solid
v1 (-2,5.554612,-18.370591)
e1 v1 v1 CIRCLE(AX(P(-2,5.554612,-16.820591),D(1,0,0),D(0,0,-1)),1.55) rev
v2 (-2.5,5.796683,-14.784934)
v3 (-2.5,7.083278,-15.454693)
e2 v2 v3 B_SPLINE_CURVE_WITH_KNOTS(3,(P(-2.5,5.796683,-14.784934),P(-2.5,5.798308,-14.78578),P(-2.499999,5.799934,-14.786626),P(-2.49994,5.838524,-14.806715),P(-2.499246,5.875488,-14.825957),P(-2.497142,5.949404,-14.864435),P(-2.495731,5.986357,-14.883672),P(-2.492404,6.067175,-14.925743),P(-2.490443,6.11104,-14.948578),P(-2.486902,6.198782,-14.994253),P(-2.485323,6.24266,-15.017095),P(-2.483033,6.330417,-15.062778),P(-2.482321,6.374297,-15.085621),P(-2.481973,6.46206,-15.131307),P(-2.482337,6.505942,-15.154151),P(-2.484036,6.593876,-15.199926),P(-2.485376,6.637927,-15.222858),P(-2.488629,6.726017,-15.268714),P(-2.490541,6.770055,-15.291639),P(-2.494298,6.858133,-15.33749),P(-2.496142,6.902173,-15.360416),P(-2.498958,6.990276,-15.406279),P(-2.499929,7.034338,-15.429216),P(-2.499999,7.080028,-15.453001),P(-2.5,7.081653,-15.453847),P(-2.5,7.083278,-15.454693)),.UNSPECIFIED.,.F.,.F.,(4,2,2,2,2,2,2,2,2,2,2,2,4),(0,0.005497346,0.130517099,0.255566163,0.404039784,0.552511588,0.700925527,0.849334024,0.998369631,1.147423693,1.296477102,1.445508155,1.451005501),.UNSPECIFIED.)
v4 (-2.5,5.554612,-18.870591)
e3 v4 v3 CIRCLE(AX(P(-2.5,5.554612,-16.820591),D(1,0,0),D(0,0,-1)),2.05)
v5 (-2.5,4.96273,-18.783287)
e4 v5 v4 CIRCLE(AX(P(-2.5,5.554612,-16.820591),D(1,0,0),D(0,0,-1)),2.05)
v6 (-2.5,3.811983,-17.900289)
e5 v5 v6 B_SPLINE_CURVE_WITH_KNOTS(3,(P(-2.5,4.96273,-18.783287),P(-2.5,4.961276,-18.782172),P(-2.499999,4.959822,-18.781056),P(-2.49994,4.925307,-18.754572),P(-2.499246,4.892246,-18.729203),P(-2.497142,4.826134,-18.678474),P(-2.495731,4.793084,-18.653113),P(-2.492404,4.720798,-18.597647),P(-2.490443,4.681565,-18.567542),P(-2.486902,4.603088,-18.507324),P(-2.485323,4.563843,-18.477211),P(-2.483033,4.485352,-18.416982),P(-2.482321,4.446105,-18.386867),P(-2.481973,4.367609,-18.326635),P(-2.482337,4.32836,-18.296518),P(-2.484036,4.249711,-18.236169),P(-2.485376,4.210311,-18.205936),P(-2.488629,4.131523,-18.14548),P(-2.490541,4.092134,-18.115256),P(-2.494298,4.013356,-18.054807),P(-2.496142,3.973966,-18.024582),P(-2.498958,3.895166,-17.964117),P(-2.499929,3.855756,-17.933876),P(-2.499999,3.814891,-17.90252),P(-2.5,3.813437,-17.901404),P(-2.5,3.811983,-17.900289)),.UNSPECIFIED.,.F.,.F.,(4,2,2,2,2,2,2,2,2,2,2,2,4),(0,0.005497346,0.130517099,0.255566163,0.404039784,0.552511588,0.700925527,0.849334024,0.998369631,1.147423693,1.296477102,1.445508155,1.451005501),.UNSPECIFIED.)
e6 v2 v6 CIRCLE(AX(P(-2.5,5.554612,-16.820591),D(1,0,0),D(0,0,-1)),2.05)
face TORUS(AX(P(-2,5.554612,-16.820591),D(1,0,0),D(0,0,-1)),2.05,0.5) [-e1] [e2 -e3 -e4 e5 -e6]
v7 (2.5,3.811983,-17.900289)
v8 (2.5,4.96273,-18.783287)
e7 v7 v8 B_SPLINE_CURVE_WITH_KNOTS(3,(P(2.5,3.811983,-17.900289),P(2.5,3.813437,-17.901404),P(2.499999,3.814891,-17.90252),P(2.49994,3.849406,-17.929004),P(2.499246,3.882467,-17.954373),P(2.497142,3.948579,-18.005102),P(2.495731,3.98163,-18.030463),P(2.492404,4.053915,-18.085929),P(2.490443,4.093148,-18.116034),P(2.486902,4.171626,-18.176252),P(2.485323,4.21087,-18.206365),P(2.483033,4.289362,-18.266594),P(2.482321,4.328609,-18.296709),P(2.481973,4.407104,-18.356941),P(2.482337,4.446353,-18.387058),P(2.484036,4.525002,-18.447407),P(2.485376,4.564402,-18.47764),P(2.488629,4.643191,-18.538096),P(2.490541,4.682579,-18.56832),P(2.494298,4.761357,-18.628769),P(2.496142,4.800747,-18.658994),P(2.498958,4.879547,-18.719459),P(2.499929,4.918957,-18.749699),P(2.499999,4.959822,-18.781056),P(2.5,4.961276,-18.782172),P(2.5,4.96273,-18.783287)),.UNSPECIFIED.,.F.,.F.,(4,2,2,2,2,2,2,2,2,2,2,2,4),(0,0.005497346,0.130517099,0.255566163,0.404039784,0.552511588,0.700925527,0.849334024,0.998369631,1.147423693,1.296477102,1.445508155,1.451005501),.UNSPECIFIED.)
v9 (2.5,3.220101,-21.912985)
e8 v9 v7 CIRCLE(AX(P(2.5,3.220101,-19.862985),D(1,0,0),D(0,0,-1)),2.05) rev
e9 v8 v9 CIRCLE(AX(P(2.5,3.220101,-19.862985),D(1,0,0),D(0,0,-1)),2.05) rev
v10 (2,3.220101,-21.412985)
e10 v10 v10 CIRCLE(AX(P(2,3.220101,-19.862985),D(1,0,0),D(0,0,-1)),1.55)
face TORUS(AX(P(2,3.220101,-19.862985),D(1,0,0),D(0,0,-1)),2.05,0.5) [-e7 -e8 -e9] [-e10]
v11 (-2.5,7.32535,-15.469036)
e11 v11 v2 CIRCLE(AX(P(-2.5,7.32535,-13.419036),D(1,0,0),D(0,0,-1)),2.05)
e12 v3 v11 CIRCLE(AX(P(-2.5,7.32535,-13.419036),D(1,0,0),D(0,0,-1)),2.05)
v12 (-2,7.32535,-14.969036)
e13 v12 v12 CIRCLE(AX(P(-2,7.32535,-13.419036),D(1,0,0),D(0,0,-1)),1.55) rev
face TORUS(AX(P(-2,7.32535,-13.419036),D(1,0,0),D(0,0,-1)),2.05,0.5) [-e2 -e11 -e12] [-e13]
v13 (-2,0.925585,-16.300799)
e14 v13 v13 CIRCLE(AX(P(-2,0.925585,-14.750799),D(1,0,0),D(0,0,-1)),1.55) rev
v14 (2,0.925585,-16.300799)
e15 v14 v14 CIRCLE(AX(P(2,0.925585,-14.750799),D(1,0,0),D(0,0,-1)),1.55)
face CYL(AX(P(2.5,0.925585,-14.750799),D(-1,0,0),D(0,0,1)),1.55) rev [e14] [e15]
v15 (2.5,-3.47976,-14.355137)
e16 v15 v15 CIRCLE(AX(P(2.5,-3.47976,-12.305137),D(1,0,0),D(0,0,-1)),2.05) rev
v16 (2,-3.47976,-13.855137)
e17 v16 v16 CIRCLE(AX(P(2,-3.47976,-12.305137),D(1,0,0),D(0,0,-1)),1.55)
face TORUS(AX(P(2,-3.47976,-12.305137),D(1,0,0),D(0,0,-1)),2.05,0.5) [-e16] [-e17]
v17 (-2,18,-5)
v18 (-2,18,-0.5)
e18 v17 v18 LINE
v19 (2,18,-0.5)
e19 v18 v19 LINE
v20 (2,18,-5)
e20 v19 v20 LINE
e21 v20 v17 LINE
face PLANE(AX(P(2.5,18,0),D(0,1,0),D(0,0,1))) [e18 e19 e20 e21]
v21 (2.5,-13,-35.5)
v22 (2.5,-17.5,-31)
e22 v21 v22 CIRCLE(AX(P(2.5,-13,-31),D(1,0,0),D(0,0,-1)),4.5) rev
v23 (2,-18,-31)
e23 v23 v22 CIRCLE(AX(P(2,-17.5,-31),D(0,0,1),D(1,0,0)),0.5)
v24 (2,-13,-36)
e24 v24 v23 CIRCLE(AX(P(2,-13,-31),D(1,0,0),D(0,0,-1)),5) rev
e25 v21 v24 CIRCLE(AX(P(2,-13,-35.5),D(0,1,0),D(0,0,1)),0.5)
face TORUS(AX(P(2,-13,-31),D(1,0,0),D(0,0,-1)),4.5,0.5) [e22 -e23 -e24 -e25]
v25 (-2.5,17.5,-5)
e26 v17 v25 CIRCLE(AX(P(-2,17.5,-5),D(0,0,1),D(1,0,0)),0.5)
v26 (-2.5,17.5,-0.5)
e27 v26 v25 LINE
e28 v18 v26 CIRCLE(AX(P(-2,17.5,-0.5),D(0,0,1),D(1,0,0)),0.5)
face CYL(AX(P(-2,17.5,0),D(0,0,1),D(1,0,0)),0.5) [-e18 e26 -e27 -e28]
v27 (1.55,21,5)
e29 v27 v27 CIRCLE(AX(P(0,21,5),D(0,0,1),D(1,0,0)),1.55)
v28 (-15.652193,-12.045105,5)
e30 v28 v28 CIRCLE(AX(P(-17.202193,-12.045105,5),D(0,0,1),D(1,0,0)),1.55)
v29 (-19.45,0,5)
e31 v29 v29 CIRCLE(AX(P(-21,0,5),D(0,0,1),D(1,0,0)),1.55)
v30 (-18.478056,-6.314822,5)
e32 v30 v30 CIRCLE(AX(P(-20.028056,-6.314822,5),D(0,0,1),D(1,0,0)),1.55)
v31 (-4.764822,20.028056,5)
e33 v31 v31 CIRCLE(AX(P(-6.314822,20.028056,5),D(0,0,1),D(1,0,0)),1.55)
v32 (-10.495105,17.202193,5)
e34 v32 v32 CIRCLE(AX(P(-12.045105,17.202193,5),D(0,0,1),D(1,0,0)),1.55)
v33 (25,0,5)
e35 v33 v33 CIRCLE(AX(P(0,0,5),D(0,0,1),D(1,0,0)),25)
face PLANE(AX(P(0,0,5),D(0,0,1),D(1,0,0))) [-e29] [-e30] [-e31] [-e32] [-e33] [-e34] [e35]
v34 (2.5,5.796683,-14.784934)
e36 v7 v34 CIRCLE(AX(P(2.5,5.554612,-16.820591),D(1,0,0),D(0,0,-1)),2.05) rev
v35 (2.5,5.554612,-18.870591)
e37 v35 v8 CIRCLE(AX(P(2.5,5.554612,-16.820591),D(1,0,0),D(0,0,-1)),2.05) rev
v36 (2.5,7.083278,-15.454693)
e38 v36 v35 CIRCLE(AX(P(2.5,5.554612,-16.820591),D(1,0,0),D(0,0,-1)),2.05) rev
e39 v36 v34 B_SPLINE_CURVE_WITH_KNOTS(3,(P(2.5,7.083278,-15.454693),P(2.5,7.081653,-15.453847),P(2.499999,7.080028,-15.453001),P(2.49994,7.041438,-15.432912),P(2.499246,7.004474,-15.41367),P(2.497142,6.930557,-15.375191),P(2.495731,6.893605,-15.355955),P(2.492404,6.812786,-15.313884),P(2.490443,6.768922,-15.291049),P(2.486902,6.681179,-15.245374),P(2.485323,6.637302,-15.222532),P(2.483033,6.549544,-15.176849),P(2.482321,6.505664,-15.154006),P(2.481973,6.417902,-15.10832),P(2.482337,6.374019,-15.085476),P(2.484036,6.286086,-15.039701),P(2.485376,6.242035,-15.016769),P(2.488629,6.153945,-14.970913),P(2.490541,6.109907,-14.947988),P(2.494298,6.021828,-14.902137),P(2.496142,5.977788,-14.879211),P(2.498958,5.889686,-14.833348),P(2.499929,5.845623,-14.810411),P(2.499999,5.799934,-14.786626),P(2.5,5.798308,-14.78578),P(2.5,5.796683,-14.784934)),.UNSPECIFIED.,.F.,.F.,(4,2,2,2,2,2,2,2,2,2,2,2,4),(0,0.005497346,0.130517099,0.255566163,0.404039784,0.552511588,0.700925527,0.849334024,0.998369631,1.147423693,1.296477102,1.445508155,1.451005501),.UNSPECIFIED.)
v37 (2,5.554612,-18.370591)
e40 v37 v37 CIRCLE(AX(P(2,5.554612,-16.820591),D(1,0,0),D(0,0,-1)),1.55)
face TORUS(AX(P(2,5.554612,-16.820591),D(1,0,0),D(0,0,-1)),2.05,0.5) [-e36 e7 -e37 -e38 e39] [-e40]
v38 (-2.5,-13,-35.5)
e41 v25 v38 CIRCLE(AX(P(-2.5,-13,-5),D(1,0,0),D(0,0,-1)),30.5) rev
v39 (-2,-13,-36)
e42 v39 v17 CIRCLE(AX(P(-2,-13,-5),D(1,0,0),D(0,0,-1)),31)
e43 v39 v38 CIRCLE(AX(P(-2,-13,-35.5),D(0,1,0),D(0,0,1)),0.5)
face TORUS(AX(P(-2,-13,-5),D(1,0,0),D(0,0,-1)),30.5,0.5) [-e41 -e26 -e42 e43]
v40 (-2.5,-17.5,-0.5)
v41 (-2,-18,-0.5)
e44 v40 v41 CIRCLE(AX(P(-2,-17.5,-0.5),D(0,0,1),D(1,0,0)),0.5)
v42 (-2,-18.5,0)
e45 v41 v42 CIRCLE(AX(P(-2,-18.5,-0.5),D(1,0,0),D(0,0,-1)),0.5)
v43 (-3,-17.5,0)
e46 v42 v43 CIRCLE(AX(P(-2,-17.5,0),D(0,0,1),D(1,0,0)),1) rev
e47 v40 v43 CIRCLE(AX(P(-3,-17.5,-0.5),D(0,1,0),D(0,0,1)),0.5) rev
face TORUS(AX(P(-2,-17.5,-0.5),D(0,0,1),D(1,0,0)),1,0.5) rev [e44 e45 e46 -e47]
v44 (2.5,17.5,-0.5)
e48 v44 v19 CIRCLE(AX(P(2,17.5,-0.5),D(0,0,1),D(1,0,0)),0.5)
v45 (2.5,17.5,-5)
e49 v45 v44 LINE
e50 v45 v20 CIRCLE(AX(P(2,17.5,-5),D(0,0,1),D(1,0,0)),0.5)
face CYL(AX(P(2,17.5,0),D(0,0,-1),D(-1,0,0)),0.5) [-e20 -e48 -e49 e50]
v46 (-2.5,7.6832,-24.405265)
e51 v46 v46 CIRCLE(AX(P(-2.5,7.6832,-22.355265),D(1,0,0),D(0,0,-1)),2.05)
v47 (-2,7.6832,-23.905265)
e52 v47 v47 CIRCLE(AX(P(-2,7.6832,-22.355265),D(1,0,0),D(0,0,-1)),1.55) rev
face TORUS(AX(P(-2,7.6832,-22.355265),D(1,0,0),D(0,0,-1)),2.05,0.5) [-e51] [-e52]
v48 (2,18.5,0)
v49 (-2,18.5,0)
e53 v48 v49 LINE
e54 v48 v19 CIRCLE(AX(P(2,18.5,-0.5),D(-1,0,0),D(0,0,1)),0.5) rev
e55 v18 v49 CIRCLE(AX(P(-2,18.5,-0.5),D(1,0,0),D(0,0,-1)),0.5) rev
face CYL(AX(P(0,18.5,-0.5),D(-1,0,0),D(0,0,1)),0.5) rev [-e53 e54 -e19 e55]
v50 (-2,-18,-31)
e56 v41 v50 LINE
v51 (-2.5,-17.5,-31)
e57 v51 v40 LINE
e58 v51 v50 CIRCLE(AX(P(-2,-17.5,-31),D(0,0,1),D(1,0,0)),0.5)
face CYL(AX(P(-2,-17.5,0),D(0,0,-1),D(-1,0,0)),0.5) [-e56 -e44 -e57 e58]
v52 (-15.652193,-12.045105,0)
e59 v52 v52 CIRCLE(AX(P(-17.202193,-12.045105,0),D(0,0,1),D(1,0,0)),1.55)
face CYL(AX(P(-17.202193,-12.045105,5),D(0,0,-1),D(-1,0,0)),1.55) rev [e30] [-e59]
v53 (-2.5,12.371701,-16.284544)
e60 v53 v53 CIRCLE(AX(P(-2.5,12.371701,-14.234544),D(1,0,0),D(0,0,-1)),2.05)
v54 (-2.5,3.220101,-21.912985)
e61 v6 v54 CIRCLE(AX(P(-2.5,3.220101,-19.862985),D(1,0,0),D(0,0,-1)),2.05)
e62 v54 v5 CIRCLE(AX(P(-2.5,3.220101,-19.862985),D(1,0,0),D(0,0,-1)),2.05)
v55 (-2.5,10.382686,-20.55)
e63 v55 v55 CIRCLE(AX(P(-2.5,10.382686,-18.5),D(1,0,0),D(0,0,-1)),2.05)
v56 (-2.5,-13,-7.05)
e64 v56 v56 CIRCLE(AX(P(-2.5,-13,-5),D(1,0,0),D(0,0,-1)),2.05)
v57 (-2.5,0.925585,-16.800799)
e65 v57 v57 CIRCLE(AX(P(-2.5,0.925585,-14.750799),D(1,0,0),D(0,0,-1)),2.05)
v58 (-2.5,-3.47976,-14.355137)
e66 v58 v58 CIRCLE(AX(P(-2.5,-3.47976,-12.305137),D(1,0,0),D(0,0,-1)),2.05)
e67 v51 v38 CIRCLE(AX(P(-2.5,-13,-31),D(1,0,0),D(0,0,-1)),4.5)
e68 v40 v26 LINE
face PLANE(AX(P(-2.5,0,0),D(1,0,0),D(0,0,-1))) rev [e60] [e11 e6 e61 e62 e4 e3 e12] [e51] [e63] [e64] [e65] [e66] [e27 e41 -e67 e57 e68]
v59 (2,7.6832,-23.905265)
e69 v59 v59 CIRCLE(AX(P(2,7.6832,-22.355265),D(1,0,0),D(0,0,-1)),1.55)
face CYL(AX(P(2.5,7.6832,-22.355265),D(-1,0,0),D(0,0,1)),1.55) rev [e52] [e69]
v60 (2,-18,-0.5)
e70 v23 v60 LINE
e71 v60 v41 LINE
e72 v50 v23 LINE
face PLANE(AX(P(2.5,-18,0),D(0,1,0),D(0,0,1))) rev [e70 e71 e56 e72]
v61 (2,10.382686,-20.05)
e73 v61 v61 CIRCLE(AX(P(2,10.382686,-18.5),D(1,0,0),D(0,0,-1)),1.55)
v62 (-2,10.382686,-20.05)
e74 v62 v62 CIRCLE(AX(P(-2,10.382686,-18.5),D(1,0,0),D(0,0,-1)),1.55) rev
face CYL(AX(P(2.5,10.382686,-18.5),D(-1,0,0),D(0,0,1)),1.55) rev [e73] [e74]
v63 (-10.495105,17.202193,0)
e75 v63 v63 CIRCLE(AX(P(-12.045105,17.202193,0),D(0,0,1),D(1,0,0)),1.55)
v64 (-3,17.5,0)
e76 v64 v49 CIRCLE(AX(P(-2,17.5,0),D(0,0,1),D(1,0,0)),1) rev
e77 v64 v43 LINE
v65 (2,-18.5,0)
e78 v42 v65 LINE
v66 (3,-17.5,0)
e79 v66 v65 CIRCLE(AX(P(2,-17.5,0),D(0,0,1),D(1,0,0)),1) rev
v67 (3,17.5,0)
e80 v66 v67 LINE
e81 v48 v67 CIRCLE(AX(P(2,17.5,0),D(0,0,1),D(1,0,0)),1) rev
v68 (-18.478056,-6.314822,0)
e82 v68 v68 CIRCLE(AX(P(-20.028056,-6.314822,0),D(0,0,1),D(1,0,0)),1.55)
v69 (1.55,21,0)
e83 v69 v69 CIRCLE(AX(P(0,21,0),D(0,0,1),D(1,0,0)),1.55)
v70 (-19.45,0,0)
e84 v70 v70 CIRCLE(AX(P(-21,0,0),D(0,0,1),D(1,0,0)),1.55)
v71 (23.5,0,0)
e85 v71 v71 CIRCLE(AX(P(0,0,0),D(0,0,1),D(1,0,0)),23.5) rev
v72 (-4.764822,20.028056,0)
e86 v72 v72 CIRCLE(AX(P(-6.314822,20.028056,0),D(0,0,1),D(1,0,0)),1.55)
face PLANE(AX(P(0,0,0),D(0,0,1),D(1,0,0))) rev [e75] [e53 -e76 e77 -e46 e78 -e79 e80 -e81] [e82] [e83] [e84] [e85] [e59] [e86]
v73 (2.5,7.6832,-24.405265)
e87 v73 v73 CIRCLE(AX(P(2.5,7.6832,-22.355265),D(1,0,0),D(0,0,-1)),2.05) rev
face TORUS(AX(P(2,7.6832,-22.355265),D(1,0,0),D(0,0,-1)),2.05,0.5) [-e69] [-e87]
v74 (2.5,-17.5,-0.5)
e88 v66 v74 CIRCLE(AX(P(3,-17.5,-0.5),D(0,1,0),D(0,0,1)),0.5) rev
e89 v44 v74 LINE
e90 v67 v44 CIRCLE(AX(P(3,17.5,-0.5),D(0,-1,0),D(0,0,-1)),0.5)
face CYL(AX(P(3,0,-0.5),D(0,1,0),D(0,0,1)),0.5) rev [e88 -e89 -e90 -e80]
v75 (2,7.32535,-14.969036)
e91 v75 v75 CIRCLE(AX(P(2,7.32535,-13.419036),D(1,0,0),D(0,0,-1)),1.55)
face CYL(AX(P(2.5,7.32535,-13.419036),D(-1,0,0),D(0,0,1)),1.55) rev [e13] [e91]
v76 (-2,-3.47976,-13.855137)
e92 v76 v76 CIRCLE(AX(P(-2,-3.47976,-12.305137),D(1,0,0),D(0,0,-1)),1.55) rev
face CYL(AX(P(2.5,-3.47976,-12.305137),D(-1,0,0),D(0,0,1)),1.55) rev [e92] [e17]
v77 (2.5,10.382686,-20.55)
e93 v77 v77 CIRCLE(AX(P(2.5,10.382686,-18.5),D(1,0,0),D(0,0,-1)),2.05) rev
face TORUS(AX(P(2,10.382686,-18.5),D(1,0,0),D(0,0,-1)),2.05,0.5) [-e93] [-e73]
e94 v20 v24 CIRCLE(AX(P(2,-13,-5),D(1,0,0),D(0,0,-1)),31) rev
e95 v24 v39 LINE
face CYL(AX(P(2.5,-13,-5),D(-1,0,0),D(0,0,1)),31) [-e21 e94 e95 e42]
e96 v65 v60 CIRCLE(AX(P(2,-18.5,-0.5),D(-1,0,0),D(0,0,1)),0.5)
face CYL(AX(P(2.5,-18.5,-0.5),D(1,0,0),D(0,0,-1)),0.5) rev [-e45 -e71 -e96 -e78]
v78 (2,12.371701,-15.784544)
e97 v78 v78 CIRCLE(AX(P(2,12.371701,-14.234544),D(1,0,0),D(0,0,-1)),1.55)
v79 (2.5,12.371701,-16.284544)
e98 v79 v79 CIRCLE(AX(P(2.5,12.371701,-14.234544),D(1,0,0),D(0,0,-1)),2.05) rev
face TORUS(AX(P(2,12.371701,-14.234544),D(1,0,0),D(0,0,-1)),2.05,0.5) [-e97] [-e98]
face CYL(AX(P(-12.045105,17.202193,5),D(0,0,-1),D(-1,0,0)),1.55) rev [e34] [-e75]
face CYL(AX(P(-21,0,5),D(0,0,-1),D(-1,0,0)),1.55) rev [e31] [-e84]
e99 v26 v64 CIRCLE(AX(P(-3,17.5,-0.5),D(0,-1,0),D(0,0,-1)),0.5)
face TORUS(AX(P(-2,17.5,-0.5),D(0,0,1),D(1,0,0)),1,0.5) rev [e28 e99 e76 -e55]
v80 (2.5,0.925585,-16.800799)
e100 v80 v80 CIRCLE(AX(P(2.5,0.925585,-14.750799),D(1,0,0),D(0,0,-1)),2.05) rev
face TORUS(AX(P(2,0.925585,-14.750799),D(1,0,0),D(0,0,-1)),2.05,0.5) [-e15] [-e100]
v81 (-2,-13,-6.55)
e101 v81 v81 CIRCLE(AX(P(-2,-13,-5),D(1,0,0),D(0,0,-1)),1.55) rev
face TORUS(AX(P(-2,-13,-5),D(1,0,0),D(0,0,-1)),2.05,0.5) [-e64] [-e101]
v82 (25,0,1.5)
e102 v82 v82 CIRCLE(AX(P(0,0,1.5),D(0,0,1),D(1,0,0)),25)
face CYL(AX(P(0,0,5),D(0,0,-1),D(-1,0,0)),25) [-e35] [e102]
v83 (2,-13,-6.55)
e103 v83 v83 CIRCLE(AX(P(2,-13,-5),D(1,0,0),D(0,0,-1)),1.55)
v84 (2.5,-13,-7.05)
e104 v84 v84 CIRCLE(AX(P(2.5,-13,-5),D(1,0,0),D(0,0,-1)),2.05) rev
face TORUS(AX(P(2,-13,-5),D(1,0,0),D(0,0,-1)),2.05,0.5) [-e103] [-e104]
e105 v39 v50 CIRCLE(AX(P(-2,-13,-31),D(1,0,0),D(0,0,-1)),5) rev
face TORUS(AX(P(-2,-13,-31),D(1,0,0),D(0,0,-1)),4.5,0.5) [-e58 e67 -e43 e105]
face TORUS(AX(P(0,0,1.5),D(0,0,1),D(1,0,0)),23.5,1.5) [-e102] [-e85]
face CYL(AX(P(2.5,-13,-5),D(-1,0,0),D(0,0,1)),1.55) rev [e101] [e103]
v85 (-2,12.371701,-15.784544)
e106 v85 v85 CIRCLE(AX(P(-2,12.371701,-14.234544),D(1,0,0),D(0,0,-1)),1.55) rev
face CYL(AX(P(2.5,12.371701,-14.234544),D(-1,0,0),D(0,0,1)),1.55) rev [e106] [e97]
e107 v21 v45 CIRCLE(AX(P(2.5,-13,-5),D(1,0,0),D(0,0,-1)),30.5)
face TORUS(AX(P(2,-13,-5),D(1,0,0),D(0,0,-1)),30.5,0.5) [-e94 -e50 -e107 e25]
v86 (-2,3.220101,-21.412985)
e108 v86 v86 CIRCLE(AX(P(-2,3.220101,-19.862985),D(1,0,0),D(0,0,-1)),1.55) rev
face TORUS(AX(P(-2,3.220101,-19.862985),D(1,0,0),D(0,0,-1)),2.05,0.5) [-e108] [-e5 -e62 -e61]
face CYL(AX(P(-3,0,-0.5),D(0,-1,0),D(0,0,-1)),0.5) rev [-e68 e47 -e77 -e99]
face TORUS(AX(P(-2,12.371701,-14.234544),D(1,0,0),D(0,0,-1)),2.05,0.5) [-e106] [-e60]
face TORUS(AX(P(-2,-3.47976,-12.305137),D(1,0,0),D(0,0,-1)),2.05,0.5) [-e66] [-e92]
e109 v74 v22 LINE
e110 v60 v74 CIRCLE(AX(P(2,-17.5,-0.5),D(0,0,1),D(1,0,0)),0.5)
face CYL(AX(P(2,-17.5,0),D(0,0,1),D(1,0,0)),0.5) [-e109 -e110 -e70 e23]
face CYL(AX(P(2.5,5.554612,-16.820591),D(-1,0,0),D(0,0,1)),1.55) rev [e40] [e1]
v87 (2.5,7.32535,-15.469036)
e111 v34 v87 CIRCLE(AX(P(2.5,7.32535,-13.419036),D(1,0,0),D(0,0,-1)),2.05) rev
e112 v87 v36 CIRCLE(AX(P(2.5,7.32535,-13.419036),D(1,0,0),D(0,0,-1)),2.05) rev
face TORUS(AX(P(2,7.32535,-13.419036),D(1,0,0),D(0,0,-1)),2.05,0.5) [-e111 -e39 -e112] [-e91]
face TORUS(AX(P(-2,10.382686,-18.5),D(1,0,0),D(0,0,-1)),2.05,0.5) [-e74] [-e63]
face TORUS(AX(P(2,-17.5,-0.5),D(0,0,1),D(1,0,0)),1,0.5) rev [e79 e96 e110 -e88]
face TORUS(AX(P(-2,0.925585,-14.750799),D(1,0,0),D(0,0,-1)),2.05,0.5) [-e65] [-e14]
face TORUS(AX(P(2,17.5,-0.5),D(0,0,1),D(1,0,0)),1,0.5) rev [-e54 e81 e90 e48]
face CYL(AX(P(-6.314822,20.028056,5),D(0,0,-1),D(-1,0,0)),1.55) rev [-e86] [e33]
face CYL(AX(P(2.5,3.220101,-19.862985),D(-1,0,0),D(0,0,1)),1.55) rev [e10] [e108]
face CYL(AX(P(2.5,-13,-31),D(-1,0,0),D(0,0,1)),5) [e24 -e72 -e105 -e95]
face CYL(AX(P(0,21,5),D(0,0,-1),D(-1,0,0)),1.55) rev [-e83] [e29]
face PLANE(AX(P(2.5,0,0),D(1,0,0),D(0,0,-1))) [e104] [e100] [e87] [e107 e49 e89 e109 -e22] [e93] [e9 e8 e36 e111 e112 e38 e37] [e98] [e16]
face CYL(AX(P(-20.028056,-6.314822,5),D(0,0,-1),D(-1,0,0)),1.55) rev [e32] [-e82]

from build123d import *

# Parameters (mm, degrees)
SKETCH_1_R      = 25
SKETCH_1_R_2    = 1.55
EXTRUDE_1_DEPTH = 5
SKETCH_3_R      = 1.55
EXTRUDE_2_DEPTH = 2.5
FILLET_1_R      = 0.5
FILLET_2_R      = 1.5
FILLET_3_R      = 5


with BuildPart() as part:
    # ｽｹｯﾁ1 → ﾎﾞｽ - 押し出し1 (new body)
    with BuildSketch(Plane.XY):
        Circle(SKETCH_1_R)
        with Locations((0, 21)):
            Circle(SKETCH_1_R_2, mode=Mode.SUBTRACT)
        with Locations((-20.028055966, -6.31482179)):
            Circle(SKETCH_1_R_2, mode=Mode.SUBTRACT)
        with Locations((-6.31482179, 20.028055966)):
            Circle(SKETCH_1_R_2, mode=Mode.SUBTRACT)
        with Locations((-21, 0)):
            Circle(SKETCH_1_R_2, mode=Mode.SUBTRACT)
        with Locations((-17.20219293, -12.045105163)):
            Circle(SKETCH_1_R_2, mode=Mode.SUBTRACT)
        with Locations((-12.045105163, 17.20219293)):
            Circle(SKETCH_1_R_2, mode=Mode.SUBTRACT)
    extrude(amount=EXTRUDE_1_DEPTH)

    # ｽｹｯﾁ3 → ﾎﾞｽ - 押し出し2 (add, symmetric)
    with BuildSketch(Plane(origin=(0, 0, 0), x_dir=(0, 0, -1), z_dir=(1, 0, 0))):
        with BuildLine():
            Line((0, 18), (0, -18))
            Line((0, -18), (36, -18))
            Line((36, -18), (36, -13))
            ThreePointArc((36, -13), (26.920310217, 8.920310217), (5, 18))
            Line((5, 18), (0, 18))
        make_face()
        with Locations((5, -13)):
            Circle(SKETCH_3_R, mode=Mode.SUBTRACT)
        with Locations((18.5, 10.382685902)):
            Circle(SKETCH_3_R, mode=Mode.SUBTRACT)
        with Locations((12.305137148, -3.479759917)):
            Circle(SKETCH_3_R, mode=Mode.SUBTRACT)
        with Locations((14.750799418, 0.925584753)):
            Circle(SKETCH_3_R, mode=Mode.SUBTRACT)
        with Locations((13.419035512, 7.325349715)):
            Circle(SKETCH_3_R, mode=Mode.SUBTRACT)
        with Locations((16.820591384, 5.554611808)):
            Circle(SKETCH_3_R, mode=Mode.SUBTRACT)
        with Locations((14.23454387, 12.371700761)):
            Circle(SKETCH_3_R, mode=Mode.SUBTRACT)
        with Locations((19.862984568, 3.22010141)):
            Circle(SKETCH_3_R, mode=Mode.SUBTRACT)
        with Locations((22.355265462, 7.683199964)):
            Circle(SKETCH_3_R, mode=Mode.SUBTRACT)
    extrude(amount=EXTRUDE_2_DEPTH, both=True)

    # ﾌｨﾚｯﾄ1
    # the kernel refuses this fillet: 0.5 mm, written as the material it takes off along each edge
    with BuildSketch(Plane(origin=(-2.5, -18, 0), x_dir=(0, 1, 0), z_dir=(0, 0, -1)), Plane(origin=(2.5, -18, 0), x_dir=(-1, 0, 0), z_dir=(0, 0, -1))) as fillet_1_piece_1:
        with BuildLine():
            CenterArc((FILLET_1_R, FILLET_1_R), FILLET_1_R, 180, 90)
            Line((0, FILLET_1_R), (0, 0))
            Line((0, 0), (FILLET_1_R, 0))
        make_face()
    extrude(amount=37.25, mode=Mode.SUBTRACT)
    with BuildSketch(Plane(origin=(-2.5, -19.25, -36), x_dir=(0, 0, 1), z_dir=(0, 1, 0))) as fillet_1_piece_2:
        with BuildLine():
            CenterArc((FILLET_1_R, FILLET_1_R), FILLET_1_R, 180, 90)
            Line((0, FILLET_1_R), (0, 0))
            Line((0, 0), (FILLET_1_R, 0))
        make_face()
    extrude(amount=6.25, mode=Mode.SUBTRACT)
    with BuildSketch(Plane(origin=(2.5, -13, -5), x_dir=(0, 0, -1), z_dir=(0, -1, 0))) as fillet_1_piece_3:
        with BuildLine():
            CenterArc((31 - FILLET_1_R, -FILLET_1_R), FILLET_1_R, 0, 90)
            Line((31, -FILLET_1_R), (31, 0))
            Line((31, 0), (31 - FILLET_1_R, 0))
        make_face()
    revolve(axis=Axis((2.5, -13, -5), (1, 0, 0)), revolution_arc=90, mode=Mode.SUBTRACT)
    with BuildSketch(Plane(origin=(2.5, 10.382685902, -18.5), x_dir=(0, 0, -1), z_dir=(0, -1, 0))) as fillet_1_piece_4:
        with BuildLine():
            CenterArc((1.55 + FILLET_1_R, -FILLET_1_R), FILLET_1_R, 90, 90)
            Line((1.55, -FILLET_1_R), (1.55, 0))
            Line((1.55, 0), (1.55 + FILLET_1_R, 0))
        make_face()
    revolve(axis=Axis((2.5, 10.382685902, -18.5), (1, 0, 0)), mode=Mode.SUBTRACT)
    with BuildSketch(Plane(origin=(2.5, 7.683199964, -22.355265462), x_dir=(0, 0, -1), z_dir=(0, -1, 0))) as fillet_1_piece_5:
        with BuildLine():
            CenterArc((1.55 + FILLET_1_R, -FILLET_1_R), FILLET_1_R, 90, 90)
            Line((1.55, -FILLET_1_R), (1.55, 0))
            Line((1.55, 0), (1.55 + FILLET_1_R, 0))
        make_face()
    revolve(axis=Axis((2.5, 7.683199964, -22.355265462), (1, 0, 0)), mode=Mode.SUBTRACT)
    with BuildSketch(Plane(origin=(2.5, 12.371700761, -14.23454387), x_dir=(0, 0, -1), z_dir=(0, -1, 0))) as fillet_1_piece_6:
        with BuildLine():
            CenterArc((1.55 + FILLET_1_R, -FILLET_1_R), FILLET_1_R, 90, 90)
            Line((1.55, -FILLET_1_R), (1.55, 0))
            Line((1.55, 0), (1.55 + FILLET_1_R, 0))
        make_face()
    revolve(axis=Axis((2.5, 12.371700761, -14.23454387), (1, 0, 0)), mode=Mode.SUBTRACT)
    with BuildSketch(Plane(origin=(2.5, 5.554611808, -16.820591384), x_dir=(0, 0, -1), z_dir=(0, -1, 0))) as fillet_1_piece_7:
        with BuildLine():
            CenterArc((1.55 + FILLET_1_R, -FILLET_1_R), FILLET_1_R, 90, 90)
            Line((1.55, -FILLET_1_R), (1.55, 0))
            Line((1.55, 0), (1.55 + FILLET_1_R, 0))
        make_face()
    revolve(axis=Axis((2.5, 5.554611808, -16.820591384), (1, 0, 0)), mode=Mode.SUBTRACT)
    with BuildSketch(Plane(origin=(2.5, 3.22010141, -19.862984568), x_dir=(0, 0, -1), z_dir=(0, -1, 0))) as fillet_1_piece_8:
        with BuildLine():
            CenterArc((1.55 + FILLET_1_R, -FILLET_1_R), FILLET_1_R, 90, 90)
            Line((1.55, -FILLET_1_R), (1.55, 0))
            Line((1.55, 0), (1.55 + FILLET_1_R, 0))
        make_face()
    revolve(axis=Axis((2.5, 3.22010141, -19.862984568), (1, 0, 0)), mode=Mode.SUBTRACT)
    with BuildSketch(Plane(origin=(2.5, 0.925584753, -14.750799418), x_dir=(0, 0, -1), z_dir=(0, -1, 0))) as fillet_1_piece_9:
        with BuildLine():
            CenterArc((1.55 + FILLET_1_R, -FILLET_1_R), FILLET_1_R, 90, 90)
            Line((1.55, -FILLET_1_R), (1.55, 0))
            Line((1.55, 0), (1.55 + FILLET_1_R, 0))
        make_face()
    revolve(axis=Axis((2.5, 0.925584753, -14.750799418), (1, 0, 0)), mode=Mode.SUBTRACT)
    with BuildSketch(Plane(origin=(2.5, 7.325349715, -13.419035512), x_dir=(0, 0, -1), z_dir=(0, -1, 0))) as fillet_1_piece_10:
        with BuildLine():
            CenterArc((1.55 + FILLET_1_R, -FILLET_1_R), FILLET_1_R, 90, 90)
            Line((1.55, -FILLET_1_R), (1.55, 0))
            Line((1.55, 0), (1.55 + FILLET_1_R, 0))
        make_face()
    revolve(axis=Axis((2.5, 7.325349715, -13.419035512), (1, 0, 0)), mode=Mode.SUBTRACT)
    with BuildSketch(Plane(origin=(2.5, -3.479759917, -12.305137148), x_dir=(0, 0, -1), z_dir=(0, -1, 0))) as fillet_1_piece_11:
        with BuildLine():
            CenterArc((1.55 + FILLET_1_R, -FILLET_1_R), FILLET_1_R, 90, 90)
            Line((1.55, -FILLET_1_R), (1.55, 0))
            Line((1.55, 0), (1.55 + FILLET_1_R, 0))
        make_face()
    revolve(axis=Axis((2.5, -3.479759917, -12.305137148), (1, 0, 0)), mode=Mode.SUBTRACT)
    with BuildSketch(Plane(origin=(2.5, 18, -5), x_dir=(0, -1, 0), z_dir=(0, 0, 1))) as fillet_1_piece_12:
        with BuildLine():
            CenterArc((FILLET_1_R, -FILLET_1_R), FILLET_1_R, 90, 90)
            Line((0, -FILLET_1_R), (0, 0))
            Line((0, 0), (FILLET_1_R, 0))
        make_face()
    extrude(amount=5, mode=Mode.SUBTRACT)
    with BuildSketch(Plane(origin=(2.5, -13, -5), x_dir=(0, 0, -1), z_dir=(0, -1, 0))) as fillet_1_piece_13:
        with BuildLine():
            CenterArc((1.55 + FILLET_1_R, -FILLET_1_R), FILLET_1_R, 90, 90)
            Line((1.55, -FILLET_1_R), (1.55, 0))
            Line((1.55, 0), (1.55 + FILLET_1_R, 0))
        make_face()
    revolve(axis=Axis((2.5, -13, -5), (1, 0, 0)), mode=Mode.SUBTRACT)
    with BuildSketch(Plane(origin=(2.5, -19.25, -36), x_dir=(0, 0, 1), z_dir=(0, 1, 0))) as fillet_1_piece_14:
        with BuildLine():
            CenterArc((FILLET_1_R, -FILLET_1_R), FILLET_1_R, 90, 90)
            Line((0, -FILLET_1_R), (0, 0))
            Line((0, 0), (FILLET_1_R, 0))
        make_face()
    extrude(amount=6.25, mode=Mode.SUBTRACT)
    with BuildSketch(Plane(origin=(-2.5, 18, -5), x_dir=(0, -1, 0), z_dir=(0, 0, 1))) as fillet_1_piece_15:
        with BuildLine():
            CenterArc((FILLET_1_R, FILLET_1_R), FILLET_1_R, 180, 90)
            Line((0, FILLET_1_R), (0, 0))
            Line((0, 0), (FILLET_1_R, 0))
        make_face()
    extrude(amount=5, mode=Mode.SUBTRACT)
    with BuildSketch(Plane(origin=(-2.5, -13, -5), x_dir=(0, 0, -1), z_dir=(0, -1, 0))) as fillet_1_piece_16:
        with BuildLine():
            CenterArc((31 - FILLET_1_R, FILLET_1_R), FILLET_1_R, 270, 90)
            Line((31, FILLET_1_R), (31, 0))
            Line((31, 0), (31 - FILLET_1_R, 0))
        make_face()
    revolve(axis=Axis((-2.5, -13, -5), (1, 0, 0)), revolution_arc=90, mode=Mode.SUBTRACT)
    with BuildSketch(Plane(origin=(-2.5, -3.479759917, -12.305137148), x_dir=(0, 0, -1), z_dir=(0, -1, 0))) as fillet_1_piece_17:
        with BuildLine():
            CenterArc((1.55 + FILLET_1_R, FILLET_1_R), FILLET_1_R, 180, 90)
            Line((1.55, FILLET_1_R), (1.55, 0))
            Line((1.55, 0), (1.55 + FILLET_1_R, 0))
        make_face()
    revolve(axis=Axis((-2.5, -3.479759917, -12.305137148), (1, 0, 0)), mode=Mode.SUBTRACT)
    with BuildSketch(Plane(origin=(-2.5, 7.325349715, -13.419035512), x_dir=(0, 0, -1), z_dir=(0, -1, 0))) as fillet_1_piece_18:
        with BuildLine():
            CenterArc((1.55 + FILLET_1_R, FILLET_1_R), FILLET_1_R, 180, 90)
            Line((1.55, FILLET_1_R), (1.55, 0))
            Line((1.55, 0), (1.55 + FILLET_1_R, 0))
        make_face()
    revolve(axis=Axis((-2.5, 7.325349715, -13.419035512), (1, 0, 0)), mode=Mode.SUBTRACT)
    with BuildSketch(Plane(origin=(-2.5, 0.925584753, -14.750799418), x_dir=(0, 0, -1), z_dir=(0, -1, 0))) as fillet_1_piece_19:
        with BuildLine():
            CenterArc((1.55 + FILLET_1_R, FILLET_1_R), FILLET_1_R, 180, 90)
            Line((1.55, FILLET_1_R), (1.55, 0))
            Line((1.55, 0), (1.55 + FILLET_1_R, 0))
        make_face()
    revolve(axis=Axis((-2.5, 0.925584753, -14.750799418), (1, 0, 0)), mode=Mode.SUBTRACT)
    with BuildSketch(Plane(origin=(-2.5, 3.22010141, -19.862984568), x_dir=(0, 0, -1), z_dir=(0, -1, 0))) as fillet_1_piece_20:
        with BuildLine():
            CenterArc((1.55 + FILLET_1_R, FILLET_1_R), FILLET_1_R, 180, 90)
            Line((1.55, FILLET_1_R), (1.55, 0))
            Line((1.55, 0), (1.55 + FILLET_1_R, 0))
        make_face()
    revolve(axis=Axis((-2.5, 3.22010141, -19.862984568), (1, 0, 0)), mode=Mode.SUBTRACT)
    with BuildSketch(Plane(origin=(-2.5, 5.554611808, -16.820591384), x_dir=(0, 0, -1), z_dir=(0, -1, 0))) as fillet_1_piece_21:
        with BuildLine():
            CenterArc((1.55 + FILLET_1_R, FILLET_1_R), FILLET_1_R, 180, 90)
            Line((1.55, FILLET_1_R), (1.55, 0))
            Line((1.55, 0), (1.55 + FILLET_1_R, 0))
        make_face()
    revolve(axis=Axis((-2.5, 5.554611808, -16.820591384), (1, 0, 0)), mode=Mode.SUBTRACT)
    with BuildSketch(Plane(origin=(-2.5, 12.371700761, -14.23454387), x_dir=(0, 0, -1), z_dir=(0, -1, 0))) as fillet_1_piece_22:
        with BuildLine():
            CenterArc((1.55 + FILLET_1_R, FILLET_1_R), FILLET_1_R, 180, 90)
            Line((1.55, FILLET_1_R), (1.55, 0))
            Line((1.55, 0), (1.55 + FILLET_1_R, 0))
        make_face()
    revolve(axis=Axis((-2.5, 12.371700761, -14.23454387), (1, 0, 0)), mode=Mode.SUBTRACT)
    with BuildSketch(Plane(origin=(-2.5, 7.683199964, -22.355265462), x_dir=(0, 0, -1), z_dir=(0, -1, 0))) as fillet_1_piece_23:
        with BuildLine():
            CenterArc((1.55 + FILLET_1_R, FILLET_1_R), FILLET_1_R, 180, 90)
            Line((1.55, FILLET_1_R), (1.55, 0))
            Line((1.55, 0), (1.55 + FILLET_1_R, 0))
        make_face()
    revolve(axis=Axis((-2.5, 7.683199964, -22.355265462), (1, 0, 0)), mode=Mode.SUBTRACT)
    with BuildSketch(Plane(origin=(-2.5, 10.382685902, -18.5), x_dir=(0, 0, -1), z_dir=(0, -1, 0))) as fillet_1_piece_24:
        with BuildLine():
            CenterArc((1.55 + FILLET_1_R, FILLET_1_R), FILLET_1_R, 180, 90)
            Line((1.55, FILLET_1_R), (1.55, 0))
            Line((1.55, 0), (1.55 + FILLET_1_R, 0))
        make_face()
    revolve(axis=Axis((-2.5, 10.382685902, -18.5), (1, 0, 0)), mode=Mode.SUBTRACT)
    with BuildSketch(Plane(origin=(-2.5, -13, -5), x_dir=(0, 0, -1), z_dir=(0, -1, 0))) as fillet_1_piece_25:
        with BuildLine():
            CenterArc((1.55 + FILLET_1_R, FILLET_1_R), FILLET_1_R, 180, 90)
            Line((1.55, FILLET_1_R), (1.55, 0))
            Line((1.55, 0), (1.55 + FILLET_1_R, 0))
        make_face()
    revolve(axis=Axis((-2.5, -13, -5), (1, 0, 0)), mode=Mode.SUBTRACT)
    # the kernel refuses this fillet: 0.5 mm, written as the material it adds along each edge
    with BuildSketch(Plane(origin=(2.5, 17.5, 0), x_dir=(1, 0, 0), z_dir=(0, -1, 0))) as fillet_1_2_piece_1:
        with BuildLine():
            CenterArc((FILLET_1_R, -FILLET_1_R), FILLET_1_R, 90, 90)
            Line((0, -FILLET_1_R), (0, 0))
            Line((0, 0), (FILLET_1_R, 0))
        make_face()
    extrude(amount=35)
    with BuildSketch(Plane(origin=(-2, 18, 0), x_dir=(0, 1, 0), z_dir=(1, 0, 0))) as fillet_1_2_piece_2:
        with BuildLine():
            CenterArc((FILLET_1_R, -FILLET_1_R), FILLET_1_R, 90, 90)
            Line((0, -FILLET_1_R), (0, 0))
            Line((0, 0), (FILLET_1_R, 0))
        make_face()
    extrude(amount=4)
    with BuildSketch(Plane(origin=(-2, -18, 0), x_dir=(0, -1, 0), z_dir=(1, 0, 0))) as fillet_1_2_piece_3:
        with BuildLine():
            CenterArc((FILLET_1_R, FILLET_1_R), FILLET_1_R, 180, 90)
            Line((0, FILLET_1_R), (0, 0))
            Line((0, 0), (FILLET_1_R, 0))
        make_face()
    extrude(amount=4)
    with BuildSketch(Plane(origin=(-2.5, 17.5, 0), x_dir=(-1, 0, 0), z_dir=(0, -1, 0))) as fillet_1_2_piece_4:
        with BuildLine():
            CenterArc((FILLET_1_R, FILLET_1_R), FILLET_1_R, 180, 90)
            Line((0, FILLET_1_R), (0, 0))
            Line((0, 0), (FILLET_1_R, 0))
        make_face()
    extrude(amount=35)
    with BuildSketch(Plane(origin=(-2, 17.5, 0), x_dir=(-1, 0, 0), z_dir=(0, -1, 0))) as fillet_1_2_piece_5:
        with BuildLine():
            CenterArc((0.5 + FILLET_1_R, FILLET_1_R), FILLET_1_R, 180, 90)
            Line((0.5, FILLET_1_R), (0.5, 0))
            Line((0.5, 0), (0.5 + FILLET_1_R, 0))
        make_face()
    revolve(axis=Axis((-2, 17.5, 0), (0, 0, -1)), revolution_arc=90)
    with BuildSketch(Plane(origin=(-2, -17.5, 0), x_dir=(-1, 0, 0), z_dir=(0, 1, 0))) as fillet_1_2_piece_6:
        with BuildLine():
            CenterArc((0.5 + FILLET_1_R, -FILLET_1_R), FILLET_1_R, 90, 90)
            Line((0.5, -FILLET_1_R), (0.5, 0))
            Line((0.5, 0), (0.5 + FILLET_1_R, 0))
        make_face()
    revolve(axis=Axis((-2, -17.5, 0), (0, 0, 1)), revolution_arc=90)
    with BuildSketch(Plane(origin=(2, -17.5, 0), x_dir=(0, -1, 0), z_dir=(-1, 0, 0))) as fillet_1_2_piece_7:
        with BuildLine():
            CenterArc((0.5 + FILLET_1_R, -FILLET_1_R), FILLET_1_R, 90, 90)
            Line((0.5, -FILLET_1_R), (0.5, 0))
            Line((0.5, 0), (0.5 + FILLET_1_R, 0))
        make_face()
    revolve(axis=Axis((2, -17.5, 0), (0, 0, 1)), revolution_arc=90)
    with BuildSketch(Plane(origin=(2, 17.5, 0), x_dir=(1, 0, 0), z_dir=(0, -1, 0))) as fillet_1_2_piece_8:
        with BuildLine():
            CenterArc((0.5 + FILLET_1_R, -FILLET_1_R), FILLET_1_R, 90, 90)
            Line((0.5, -FILLET_1_R), (0.5, 0))
            Line((0.5, 0), (0.5 + FILLET_1_R, 0))
        make_face()
    revolve(axis=Axis((2, 17.5, 0), (0, 0, 1)), revolution_arc=90)

    # ﾌｨﾚｯﾄ2
    fillet_2_edges = [part.edges().sort_by_distance(p)[0] for p in [
        (-25, 0, 0),
    ]]
    fillet(fillet_2_edges, radius=FILLET_2_R)

    # ﾌｨﾚｯﾄ3
    # the kernel refuses this fillet: 5 mm, written as the material it takes off along each edge
    with BuildSketch(Plane(origin=(-2.5, -13, -31), x_dir=(0, 0, -1), z_dir=(0, 1, 0))) as fillet_3_piece_1:
        with BuildLine():
            CenterArc((4.5, -0.5), 0.5, 0, 90)
            Line((5, -0.5), (5, 0))
            Line((5, 0), (4.5, 0))
        make_face()
    revolve(axis=Axis((-2.5, -13, -31), (-1, 0, 0)), revolution_arc=90, mode=Mode.SUBTRACT)
    with BuildSketch(Plane(origin=(2.5, -13, -31), x_dir=(0, -1, 0), z_dir=(0, 0, 1))) as fillet_3_piece_2:
        with BuildLine():
            CenterArc((4.5, -0.5), 0.5, 0, 90)
            Line((5, -0.5), (5, 0))
            Line((5, 0), (4.5, 0))
        make_face()
    revolve(axis=Axis((2.5, -13, -31), (1, 0, 0)), revolution_arc=90, mode=Mode.SUBTRACT)
    with BuildSketch(Plane(origin=(2.5, -18, -36), x_dir=(0, 0, 1), z_dir=(-1, 0, 0))) as fillet_3_piece_3:
        with BuildLine():
            CenterArc((FILLET_3_R, FILLET_3_R), FILLET_3_R, 180, 90)
            Line((0, FILLET_3_R), (0, 0))
            Line((0, 0), (FILLET_3_R, 0))
        make_face()
    extrude(amount=5, mode=Mode.SUBTRACT)


solid = part.part
